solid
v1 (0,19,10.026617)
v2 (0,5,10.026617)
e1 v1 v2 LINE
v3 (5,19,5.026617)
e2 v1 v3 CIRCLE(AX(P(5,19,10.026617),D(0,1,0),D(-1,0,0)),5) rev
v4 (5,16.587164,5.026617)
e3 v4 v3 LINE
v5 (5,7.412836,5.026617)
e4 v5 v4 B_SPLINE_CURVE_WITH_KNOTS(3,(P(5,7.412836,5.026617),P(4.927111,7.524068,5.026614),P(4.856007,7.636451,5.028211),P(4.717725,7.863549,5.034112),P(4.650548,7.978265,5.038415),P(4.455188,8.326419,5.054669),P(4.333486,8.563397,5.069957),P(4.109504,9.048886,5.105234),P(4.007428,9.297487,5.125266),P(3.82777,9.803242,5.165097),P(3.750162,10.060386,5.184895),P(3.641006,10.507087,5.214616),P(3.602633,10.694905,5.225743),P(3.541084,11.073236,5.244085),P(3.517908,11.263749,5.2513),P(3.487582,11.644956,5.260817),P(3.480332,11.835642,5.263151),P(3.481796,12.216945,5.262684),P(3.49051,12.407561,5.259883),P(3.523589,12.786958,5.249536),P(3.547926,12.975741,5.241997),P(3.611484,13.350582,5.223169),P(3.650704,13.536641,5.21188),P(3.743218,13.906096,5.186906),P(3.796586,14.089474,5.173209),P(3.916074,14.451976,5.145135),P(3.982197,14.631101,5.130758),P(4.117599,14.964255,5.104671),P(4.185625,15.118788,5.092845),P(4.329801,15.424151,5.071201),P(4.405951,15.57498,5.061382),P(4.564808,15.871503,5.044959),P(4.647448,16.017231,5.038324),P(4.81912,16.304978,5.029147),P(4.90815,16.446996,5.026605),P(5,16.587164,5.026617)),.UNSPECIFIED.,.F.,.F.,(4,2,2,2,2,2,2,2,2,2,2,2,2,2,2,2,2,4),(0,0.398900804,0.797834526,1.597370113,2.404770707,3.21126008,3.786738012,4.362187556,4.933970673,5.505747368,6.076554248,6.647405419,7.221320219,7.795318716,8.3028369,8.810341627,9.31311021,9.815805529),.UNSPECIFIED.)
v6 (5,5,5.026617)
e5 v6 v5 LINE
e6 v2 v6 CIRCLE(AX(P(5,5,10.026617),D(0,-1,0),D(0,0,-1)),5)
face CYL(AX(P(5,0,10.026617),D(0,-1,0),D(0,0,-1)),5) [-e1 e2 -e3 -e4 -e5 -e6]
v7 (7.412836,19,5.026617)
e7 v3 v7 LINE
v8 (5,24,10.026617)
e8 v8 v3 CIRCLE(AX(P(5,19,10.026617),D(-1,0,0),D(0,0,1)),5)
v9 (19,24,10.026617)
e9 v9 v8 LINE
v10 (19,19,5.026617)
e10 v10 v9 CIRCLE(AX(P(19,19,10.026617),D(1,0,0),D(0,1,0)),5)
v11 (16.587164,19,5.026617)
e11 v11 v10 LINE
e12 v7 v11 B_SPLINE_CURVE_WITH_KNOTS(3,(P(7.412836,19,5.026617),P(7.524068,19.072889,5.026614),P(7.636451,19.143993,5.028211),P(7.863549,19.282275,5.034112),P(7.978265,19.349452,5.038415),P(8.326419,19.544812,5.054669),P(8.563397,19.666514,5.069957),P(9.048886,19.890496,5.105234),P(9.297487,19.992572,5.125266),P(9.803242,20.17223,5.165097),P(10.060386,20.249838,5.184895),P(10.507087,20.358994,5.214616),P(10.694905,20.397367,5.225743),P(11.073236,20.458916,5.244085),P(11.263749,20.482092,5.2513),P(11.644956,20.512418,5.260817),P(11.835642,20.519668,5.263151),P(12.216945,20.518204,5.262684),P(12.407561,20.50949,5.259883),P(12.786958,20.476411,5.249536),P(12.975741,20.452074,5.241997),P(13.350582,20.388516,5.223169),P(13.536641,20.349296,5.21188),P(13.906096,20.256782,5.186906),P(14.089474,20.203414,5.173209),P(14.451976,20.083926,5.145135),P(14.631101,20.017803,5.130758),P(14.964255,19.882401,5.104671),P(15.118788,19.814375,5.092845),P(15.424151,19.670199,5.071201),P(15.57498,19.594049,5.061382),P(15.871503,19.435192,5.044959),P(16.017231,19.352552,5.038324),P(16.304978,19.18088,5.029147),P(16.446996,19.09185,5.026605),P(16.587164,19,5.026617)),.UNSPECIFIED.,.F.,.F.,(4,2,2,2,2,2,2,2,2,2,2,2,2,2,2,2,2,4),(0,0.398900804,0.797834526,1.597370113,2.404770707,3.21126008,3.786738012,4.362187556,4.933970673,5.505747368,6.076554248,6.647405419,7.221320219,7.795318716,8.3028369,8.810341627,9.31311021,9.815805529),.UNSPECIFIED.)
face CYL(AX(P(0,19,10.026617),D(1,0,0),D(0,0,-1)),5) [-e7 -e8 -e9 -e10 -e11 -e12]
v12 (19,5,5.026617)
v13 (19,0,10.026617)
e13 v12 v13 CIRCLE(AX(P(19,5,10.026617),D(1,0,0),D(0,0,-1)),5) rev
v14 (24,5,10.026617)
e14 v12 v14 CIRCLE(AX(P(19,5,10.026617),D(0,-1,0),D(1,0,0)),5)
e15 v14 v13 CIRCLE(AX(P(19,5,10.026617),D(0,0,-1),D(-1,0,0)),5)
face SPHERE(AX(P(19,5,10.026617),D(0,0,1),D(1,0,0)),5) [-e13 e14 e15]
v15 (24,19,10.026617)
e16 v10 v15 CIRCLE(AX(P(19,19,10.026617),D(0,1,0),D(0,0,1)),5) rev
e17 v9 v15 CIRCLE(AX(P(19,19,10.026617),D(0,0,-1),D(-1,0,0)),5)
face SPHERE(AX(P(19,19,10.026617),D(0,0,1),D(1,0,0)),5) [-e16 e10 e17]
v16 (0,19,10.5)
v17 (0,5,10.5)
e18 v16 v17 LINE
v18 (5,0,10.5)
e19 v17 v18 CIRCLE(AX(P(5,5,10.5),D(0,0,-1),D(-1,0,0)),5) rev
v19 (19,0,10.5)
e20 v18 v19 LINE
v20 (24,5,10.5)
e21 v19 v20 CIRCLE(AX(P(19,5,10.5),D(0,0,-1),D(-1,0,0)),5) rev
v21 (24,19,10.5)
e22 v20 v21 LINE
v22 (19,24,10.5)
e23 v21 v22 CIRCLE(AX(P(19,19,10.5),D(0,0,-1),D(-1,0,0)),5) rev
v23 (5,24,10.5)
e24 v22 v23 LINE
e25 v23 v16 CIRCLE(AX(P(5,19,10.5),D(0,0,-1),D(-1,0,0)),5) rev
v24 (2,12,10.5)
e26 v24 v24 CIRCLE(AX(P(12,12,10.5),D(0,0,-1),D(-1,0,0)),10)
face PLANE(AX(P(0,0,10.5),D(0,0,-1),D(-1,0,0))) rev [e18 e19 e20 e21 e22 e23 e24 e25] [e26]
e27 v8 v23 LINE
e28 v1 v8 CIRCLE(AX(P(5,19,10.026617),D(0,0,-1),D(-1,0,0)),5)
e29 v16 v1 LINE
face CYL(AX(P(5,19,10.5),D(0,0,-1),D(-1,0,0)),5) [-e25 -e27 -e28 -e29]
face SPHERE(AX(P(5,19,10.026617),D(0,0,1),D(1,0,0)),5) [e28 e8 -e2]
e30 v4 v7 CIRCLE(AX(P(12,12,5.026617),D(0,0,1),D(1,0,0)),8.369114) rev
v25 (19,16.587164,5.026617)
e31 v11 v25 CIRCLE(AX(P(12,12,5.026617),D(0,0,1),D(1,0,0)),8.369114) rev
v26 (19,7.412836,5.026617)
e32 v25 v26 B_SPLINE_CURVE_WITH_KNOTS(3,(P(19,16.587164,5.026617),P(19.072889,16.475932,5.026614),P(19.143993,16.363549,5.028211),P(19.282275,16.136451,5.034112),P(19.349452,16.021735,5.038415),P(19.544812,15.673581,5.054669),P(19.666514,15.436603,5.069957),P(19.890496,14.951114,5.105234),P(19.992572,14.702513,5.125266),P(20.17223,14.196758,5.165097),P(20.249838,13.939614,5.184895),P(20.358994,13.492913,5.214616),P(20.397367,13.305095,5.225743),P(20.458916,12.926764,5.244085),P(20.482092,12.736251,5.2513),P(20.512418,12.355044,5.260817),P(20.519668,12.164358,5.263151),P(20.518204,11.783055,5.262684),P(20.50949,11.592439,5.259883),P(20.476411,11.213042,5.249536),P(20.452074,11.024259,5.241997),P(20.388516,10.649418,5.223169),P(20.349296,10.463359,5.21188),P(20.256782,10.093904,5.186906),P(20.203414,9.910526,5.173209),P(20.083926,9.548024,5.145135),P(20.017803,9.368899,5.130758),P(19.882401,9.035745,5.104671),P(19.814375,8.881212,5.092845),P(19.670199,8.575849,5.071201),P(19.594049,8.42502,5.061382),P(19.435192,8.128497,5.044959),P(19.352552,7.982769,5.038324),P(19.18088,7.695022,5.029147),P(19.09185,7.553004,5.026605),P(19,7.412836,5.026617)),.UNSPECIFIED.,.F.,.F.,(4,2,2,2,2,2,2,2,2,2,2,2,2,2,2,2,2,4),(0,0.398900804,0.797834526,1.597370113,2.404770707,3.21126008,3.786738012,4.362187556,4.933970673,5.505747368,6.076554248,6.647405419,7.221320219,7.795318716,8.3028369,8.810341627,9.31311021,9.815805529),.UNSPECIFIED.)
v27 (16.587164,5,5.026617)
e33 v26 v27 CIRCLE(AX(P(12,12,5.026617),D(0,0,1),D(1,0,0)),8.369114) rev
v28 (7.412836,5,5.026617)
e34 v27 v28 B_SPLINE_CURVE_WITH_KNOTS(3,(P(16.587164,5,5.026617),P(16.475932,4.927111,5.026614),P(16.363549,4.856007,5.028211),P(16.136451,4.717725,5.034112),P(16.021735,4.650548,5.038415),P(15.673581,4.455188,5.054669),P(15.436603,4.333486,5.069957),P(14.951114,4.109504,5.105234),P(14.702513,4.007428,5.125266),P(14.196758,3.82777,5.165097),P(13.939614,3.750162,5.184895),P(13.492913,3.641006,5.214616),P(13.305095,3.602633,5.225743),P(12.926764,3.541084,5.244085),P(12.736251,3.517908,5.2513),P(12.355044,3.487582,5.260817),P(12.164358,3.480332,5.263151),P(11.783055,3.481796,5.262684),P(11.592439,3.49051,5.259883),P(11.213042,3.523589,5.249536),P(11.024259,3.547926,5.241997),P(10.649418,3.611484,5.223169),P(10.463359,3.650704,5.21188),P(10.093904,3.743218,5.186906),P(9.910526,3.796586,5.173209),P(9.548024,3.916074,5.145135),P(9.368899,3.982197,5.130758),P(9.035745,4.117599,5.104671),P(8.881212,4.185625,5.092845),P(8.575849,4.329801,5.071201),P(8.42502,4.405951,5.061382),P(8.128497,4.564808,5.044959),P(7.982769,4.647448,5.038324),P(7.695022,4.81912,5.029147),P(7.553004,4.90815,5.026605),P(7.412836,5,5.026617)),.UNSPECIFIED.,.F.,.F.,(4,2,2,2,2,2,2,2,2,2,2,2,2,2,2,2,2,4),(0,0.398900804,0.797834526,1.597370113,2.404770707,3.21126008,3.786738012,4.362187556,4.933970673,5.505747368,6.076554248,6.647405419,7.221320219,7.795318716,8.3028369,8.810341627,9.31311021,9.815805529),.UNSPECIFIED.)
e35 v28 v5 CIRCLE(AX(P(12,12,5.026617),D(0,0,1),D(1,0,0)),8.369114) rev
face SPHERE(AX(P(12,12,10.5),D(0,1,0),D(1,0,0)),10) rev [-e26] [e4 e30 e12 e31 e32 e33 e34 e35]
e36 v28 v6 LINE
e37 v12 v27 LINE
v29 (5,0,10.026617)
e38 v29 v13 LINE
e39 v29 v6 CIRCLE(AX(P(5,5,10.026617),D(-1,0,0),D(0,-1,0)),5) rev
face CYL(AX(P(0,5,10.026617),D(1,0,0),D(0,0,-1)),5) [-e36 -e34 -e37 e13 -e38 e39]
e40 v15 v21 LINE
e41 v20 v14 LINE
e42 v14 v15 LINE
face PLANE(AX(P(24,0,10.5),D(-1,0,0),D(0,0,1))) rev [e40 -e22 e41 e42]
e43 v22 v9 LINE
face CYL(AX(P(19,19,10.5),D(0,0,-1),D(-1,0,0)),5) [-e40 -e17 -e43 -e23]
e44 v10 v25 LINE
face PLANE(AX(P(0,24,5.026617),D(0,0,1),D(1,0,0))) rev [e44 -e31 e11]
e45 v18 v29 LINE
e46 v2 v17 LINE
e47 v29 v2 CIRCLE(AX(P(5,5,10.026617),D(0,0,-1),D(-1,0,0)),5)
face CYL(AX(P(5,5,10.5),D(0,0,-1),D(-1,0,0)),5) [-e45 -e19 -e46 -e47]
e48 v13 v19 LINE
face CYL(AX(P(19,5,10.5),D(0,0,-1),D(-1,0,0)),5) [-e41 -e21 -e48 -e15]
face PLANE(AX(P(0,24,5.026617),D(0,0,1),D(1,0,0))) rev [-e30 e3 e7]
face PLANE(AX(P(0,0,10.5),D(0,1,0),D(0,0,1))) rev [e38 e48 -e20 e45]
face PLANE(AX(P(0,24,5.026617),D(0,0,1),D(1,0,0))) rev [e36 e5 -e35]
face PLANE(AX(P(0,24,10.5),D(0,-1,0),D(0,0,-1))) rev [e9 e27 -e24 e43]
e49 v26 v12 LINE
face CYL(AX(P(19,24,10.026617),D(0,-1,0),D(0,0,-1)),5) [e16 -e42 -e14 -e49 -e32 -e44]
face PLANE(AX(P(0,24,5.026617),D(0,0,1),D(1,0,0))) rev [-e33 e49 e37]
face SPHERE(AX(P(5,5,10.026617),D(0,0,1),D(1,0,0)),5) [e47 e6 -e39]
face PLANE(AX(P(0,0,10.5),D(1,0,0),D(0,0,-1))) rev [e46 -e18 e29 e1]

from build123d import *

# Parameters (mm, degrees)
SKETCH2_W           = 24
SKETCH2_H           = 24
BOSS_EXTRUDE1_DEPTH = 10.5
CUT_EXTRUDE1_DEPTH  = 36.528157847
FILLET1_R           = 5


with BuildPart() as part:
    # Sketch2 → Boss-Extrude1 (new body)
    with BuildSketch(Plane.XY):
        with Locations((12, 12)):
            Rectangle(SKETCH2_W, SKETCH2_H)
    extrude(amount=BOSS_EXTRUDE1_DEPTH)

    # Sketch4 → Cut-Revolve1 (revolve, cut)
    with BuildSketch(Plane.XY.offset(10.5)):
        with BuildLine():
            Line((12, 22), (12, 2))
            ThreePointArc((12, 2), (2, 12), (12, 22))
        make_face()
    revolve(axis=Axis((12, 22, 10.5), (0, -1, 0)), mode=Mode.SUBTRACT)

    # Sketch6 → Cut-Extrude1 (cut, through all)
    with BuildSketch(Plane(origin=(24, 0, 0), x_dir=(0, 0, -1), z_dir=(1, 0, 0))):
        Polygon((0, 24), (-3.026616613, 24), (-5.026616613, 24), (-5.026616613, 0), (-3.026616613, 0), (0, 0), align=None)
    extrude(amount=-CUT_EXTRUDE1_DEPTH, mode=Mode.SUBTRACT)

    # Fillet1
    # the kernel refuses this fillet: 5 mm, written as the material it takes off along each edge
    with BuildSketch(Plane(origin=(5, 19, 10.026616613), x_dir=(-1, 0, 0), z_dir=(0, 0, -1))) as fillet1_piece_1_section:
        Polygon((0, 0), (FILLET1_R, 0), (FILLET1_R, FILLET1_R), (0, FILLET1_R), align=None)
    fillet1_piece_1 = extrude(amount=FILLET1_R, mode=Mode.PRIVATE)
    fillet1_piece_1 = fillet1_piece_1 - Plane(origin=(5, 19, 10.026616613), x_dir=(0.7071067811865475, -0.7071067811865475, 0), z_dir=(0, 0, -1)) * Sphere(FILLET1_R, mode=Mode.PRIVATE)
    add(fillet1_piece_1, mode=Mode.SUBTRACT)
    with BuildSketch(Plane(origin=(5, 5, 10.026616613), x_dir=(0, 0, -1), z_dir=(0, -1, 0))) as fillet1_piece_2_section:
        Polygon((0, 0), (FILLET1_R, 0), (FILLET1_R, -FILLET1_R), (0, -FILLET1_R), align=None)
    fillet1_piece_2 = extrude(amount=FILLET1_R, mode=Mode.PRIVATE)
    fillet1_piece_2 = fillet1_piece_2 - Plane(origin=(5, 5, 10.026616613), x_dir=(0.7071067811865475, 0, 0.7071067811865475), z_dir=(0, -1, 0)) * Sphere(FILLET1_R, mode=Mode.PRIVATE)
    add(fillet1_piece_2, mode=Mode.SUBTRACT)
    with BuildSketch(Plane(origin=(19, 5, 10.026616613), x_dir=(0, 0, -1), z_dir=(0, -1, 0))) as fillet1_piece_3_section:
        Polygon((0, 0), (FILLET1_R, 0), (FILLET1_R, FILLET1_R), (0, FILLET1_R), align=None)
    fillet1_piece_3 = extrude(amount=FILLET1_R, mode=Mode.PRIVATE)
    fillet1_piece_3 = fillet1_piece_3 - Plane(origin=(19, 5, 10.026616613), x_dir=(-0.7071067811865475, 0, 0.7071067811865475), z_dir=(0, -1, 0)) * Sphere(FILLET1_R, mode=Mode.PRIVATE)
    add(fillet1_piece_3, mode=Mode.SUBTRACT)
    with BuildSketch(Plane(origin=(19, 19, 10.026616613), x_dir=(1, 0, 0), z_dir=(0, 0, -1))) as fillet1_piece_4_section:
        Polygon((0, 0), (FILLET1_R, 0), (FILLET1_R, -FILLET1_R), (0, -FILLET1_R), align=None)
    fillet1_piece_4 = extrude(amount=FILLET1_R, mode=Mode.PRIVATE)
    fillet1_piece_4 = fillet1_piece_4 - Plane(origin=(19, 19, 10.026616613), x_dir=(-0.7071067811865475, -0.7071067811865475, 0), z_dir=(0, 0, -1)) * Sphere(FILLET1_R, mode=Mode.PRIVATE)
    add(fillet1_piece_4, mode=Mode.SUBTRACT)
    with BuildSketch(Plane(origin=(0, 19, 5.026616613), x_dir=(1, 0, 0), z_dir=(0, -1, 0)), Plane(origin=(19, 0, 5.026616613), x_dir=(0, 0, 1), z_dir=(-1, 0, 0)), Plane(origin=(19, 24, 5.026616613), x_dir=(0, -1, 0), z_dir=(-1, 0, 0))) as fillet1_piece_5:
        with BuildLine():
            CenterArc((FILLET1_R, FILLET1_R), FILLET1_R, 180, 90)
            Line((0, FILLET1_R), (0, 0))
            Line((0, 0), (FILLET1_R, 0))
        make_face()
    extrude(amount=14, mode=Mode.SUBTRACT)
    with BuildSketch(Plane(origin=(24, 19, 5.026616613), x_dir=(-1, 0, 0), z_dir=(0, -1, 0))) as fillet1_piece_6:
        with BuildLine():
            CenterArc((FILLET1_R, -FILLET1_R), FILLET1_R, 90, 90)
            Line((0, -FILLET1_R), (0, 0))
            Line((0, 0), (FILLET1_R, 0))
        make_face()
    extrude(amount=14, mode=Mode.SUBTRACT)
    with BuildSketch(Plane(origin=(0, 24, 10.026616613), x_dir=(0, -1, 0), z_dir=(0, 0, 1)), Plane(origin=(0, 0, 10.026616613), x_dir=(1, 0, 0), z_dir=(0, 0, 1))) as fillet1_piece_7:
        with BuildLine():
            CenterArc((FILLET1_R, FILLET1_R), FILLET1_R, 180, 90)
            Line((0, FILLET1_R), (0, 0))
            Line((0, 0), (FILLET1_R, 0))
        make_face()
    extrude(amount=12.973383387, mode=Mode.SUBTRACT)
    with BuildSketch(Plane(origin=(24, 24, 10.026616613), x_dir=(0, -1, 0), z_dir=(0, 0, 1)), Plane(origin=(24, 0, 10.026616613), x_dir=(-1, 0, 0), z_dir=(0, 0, 1))) as fillet1_piece_8:
        with BuildLine():
            CenterArc((FILLET1_R, -FILLET1_R), FILLET1_R, 90, 90)
            Line((0, -FILLET1_R), (0, 0))
            Line((0, 0), (FILLET1_R, 0))
        make_face()
    extrude(amount=12.973383387, mode=Mode.SUBTRACT)


solid = part.part
